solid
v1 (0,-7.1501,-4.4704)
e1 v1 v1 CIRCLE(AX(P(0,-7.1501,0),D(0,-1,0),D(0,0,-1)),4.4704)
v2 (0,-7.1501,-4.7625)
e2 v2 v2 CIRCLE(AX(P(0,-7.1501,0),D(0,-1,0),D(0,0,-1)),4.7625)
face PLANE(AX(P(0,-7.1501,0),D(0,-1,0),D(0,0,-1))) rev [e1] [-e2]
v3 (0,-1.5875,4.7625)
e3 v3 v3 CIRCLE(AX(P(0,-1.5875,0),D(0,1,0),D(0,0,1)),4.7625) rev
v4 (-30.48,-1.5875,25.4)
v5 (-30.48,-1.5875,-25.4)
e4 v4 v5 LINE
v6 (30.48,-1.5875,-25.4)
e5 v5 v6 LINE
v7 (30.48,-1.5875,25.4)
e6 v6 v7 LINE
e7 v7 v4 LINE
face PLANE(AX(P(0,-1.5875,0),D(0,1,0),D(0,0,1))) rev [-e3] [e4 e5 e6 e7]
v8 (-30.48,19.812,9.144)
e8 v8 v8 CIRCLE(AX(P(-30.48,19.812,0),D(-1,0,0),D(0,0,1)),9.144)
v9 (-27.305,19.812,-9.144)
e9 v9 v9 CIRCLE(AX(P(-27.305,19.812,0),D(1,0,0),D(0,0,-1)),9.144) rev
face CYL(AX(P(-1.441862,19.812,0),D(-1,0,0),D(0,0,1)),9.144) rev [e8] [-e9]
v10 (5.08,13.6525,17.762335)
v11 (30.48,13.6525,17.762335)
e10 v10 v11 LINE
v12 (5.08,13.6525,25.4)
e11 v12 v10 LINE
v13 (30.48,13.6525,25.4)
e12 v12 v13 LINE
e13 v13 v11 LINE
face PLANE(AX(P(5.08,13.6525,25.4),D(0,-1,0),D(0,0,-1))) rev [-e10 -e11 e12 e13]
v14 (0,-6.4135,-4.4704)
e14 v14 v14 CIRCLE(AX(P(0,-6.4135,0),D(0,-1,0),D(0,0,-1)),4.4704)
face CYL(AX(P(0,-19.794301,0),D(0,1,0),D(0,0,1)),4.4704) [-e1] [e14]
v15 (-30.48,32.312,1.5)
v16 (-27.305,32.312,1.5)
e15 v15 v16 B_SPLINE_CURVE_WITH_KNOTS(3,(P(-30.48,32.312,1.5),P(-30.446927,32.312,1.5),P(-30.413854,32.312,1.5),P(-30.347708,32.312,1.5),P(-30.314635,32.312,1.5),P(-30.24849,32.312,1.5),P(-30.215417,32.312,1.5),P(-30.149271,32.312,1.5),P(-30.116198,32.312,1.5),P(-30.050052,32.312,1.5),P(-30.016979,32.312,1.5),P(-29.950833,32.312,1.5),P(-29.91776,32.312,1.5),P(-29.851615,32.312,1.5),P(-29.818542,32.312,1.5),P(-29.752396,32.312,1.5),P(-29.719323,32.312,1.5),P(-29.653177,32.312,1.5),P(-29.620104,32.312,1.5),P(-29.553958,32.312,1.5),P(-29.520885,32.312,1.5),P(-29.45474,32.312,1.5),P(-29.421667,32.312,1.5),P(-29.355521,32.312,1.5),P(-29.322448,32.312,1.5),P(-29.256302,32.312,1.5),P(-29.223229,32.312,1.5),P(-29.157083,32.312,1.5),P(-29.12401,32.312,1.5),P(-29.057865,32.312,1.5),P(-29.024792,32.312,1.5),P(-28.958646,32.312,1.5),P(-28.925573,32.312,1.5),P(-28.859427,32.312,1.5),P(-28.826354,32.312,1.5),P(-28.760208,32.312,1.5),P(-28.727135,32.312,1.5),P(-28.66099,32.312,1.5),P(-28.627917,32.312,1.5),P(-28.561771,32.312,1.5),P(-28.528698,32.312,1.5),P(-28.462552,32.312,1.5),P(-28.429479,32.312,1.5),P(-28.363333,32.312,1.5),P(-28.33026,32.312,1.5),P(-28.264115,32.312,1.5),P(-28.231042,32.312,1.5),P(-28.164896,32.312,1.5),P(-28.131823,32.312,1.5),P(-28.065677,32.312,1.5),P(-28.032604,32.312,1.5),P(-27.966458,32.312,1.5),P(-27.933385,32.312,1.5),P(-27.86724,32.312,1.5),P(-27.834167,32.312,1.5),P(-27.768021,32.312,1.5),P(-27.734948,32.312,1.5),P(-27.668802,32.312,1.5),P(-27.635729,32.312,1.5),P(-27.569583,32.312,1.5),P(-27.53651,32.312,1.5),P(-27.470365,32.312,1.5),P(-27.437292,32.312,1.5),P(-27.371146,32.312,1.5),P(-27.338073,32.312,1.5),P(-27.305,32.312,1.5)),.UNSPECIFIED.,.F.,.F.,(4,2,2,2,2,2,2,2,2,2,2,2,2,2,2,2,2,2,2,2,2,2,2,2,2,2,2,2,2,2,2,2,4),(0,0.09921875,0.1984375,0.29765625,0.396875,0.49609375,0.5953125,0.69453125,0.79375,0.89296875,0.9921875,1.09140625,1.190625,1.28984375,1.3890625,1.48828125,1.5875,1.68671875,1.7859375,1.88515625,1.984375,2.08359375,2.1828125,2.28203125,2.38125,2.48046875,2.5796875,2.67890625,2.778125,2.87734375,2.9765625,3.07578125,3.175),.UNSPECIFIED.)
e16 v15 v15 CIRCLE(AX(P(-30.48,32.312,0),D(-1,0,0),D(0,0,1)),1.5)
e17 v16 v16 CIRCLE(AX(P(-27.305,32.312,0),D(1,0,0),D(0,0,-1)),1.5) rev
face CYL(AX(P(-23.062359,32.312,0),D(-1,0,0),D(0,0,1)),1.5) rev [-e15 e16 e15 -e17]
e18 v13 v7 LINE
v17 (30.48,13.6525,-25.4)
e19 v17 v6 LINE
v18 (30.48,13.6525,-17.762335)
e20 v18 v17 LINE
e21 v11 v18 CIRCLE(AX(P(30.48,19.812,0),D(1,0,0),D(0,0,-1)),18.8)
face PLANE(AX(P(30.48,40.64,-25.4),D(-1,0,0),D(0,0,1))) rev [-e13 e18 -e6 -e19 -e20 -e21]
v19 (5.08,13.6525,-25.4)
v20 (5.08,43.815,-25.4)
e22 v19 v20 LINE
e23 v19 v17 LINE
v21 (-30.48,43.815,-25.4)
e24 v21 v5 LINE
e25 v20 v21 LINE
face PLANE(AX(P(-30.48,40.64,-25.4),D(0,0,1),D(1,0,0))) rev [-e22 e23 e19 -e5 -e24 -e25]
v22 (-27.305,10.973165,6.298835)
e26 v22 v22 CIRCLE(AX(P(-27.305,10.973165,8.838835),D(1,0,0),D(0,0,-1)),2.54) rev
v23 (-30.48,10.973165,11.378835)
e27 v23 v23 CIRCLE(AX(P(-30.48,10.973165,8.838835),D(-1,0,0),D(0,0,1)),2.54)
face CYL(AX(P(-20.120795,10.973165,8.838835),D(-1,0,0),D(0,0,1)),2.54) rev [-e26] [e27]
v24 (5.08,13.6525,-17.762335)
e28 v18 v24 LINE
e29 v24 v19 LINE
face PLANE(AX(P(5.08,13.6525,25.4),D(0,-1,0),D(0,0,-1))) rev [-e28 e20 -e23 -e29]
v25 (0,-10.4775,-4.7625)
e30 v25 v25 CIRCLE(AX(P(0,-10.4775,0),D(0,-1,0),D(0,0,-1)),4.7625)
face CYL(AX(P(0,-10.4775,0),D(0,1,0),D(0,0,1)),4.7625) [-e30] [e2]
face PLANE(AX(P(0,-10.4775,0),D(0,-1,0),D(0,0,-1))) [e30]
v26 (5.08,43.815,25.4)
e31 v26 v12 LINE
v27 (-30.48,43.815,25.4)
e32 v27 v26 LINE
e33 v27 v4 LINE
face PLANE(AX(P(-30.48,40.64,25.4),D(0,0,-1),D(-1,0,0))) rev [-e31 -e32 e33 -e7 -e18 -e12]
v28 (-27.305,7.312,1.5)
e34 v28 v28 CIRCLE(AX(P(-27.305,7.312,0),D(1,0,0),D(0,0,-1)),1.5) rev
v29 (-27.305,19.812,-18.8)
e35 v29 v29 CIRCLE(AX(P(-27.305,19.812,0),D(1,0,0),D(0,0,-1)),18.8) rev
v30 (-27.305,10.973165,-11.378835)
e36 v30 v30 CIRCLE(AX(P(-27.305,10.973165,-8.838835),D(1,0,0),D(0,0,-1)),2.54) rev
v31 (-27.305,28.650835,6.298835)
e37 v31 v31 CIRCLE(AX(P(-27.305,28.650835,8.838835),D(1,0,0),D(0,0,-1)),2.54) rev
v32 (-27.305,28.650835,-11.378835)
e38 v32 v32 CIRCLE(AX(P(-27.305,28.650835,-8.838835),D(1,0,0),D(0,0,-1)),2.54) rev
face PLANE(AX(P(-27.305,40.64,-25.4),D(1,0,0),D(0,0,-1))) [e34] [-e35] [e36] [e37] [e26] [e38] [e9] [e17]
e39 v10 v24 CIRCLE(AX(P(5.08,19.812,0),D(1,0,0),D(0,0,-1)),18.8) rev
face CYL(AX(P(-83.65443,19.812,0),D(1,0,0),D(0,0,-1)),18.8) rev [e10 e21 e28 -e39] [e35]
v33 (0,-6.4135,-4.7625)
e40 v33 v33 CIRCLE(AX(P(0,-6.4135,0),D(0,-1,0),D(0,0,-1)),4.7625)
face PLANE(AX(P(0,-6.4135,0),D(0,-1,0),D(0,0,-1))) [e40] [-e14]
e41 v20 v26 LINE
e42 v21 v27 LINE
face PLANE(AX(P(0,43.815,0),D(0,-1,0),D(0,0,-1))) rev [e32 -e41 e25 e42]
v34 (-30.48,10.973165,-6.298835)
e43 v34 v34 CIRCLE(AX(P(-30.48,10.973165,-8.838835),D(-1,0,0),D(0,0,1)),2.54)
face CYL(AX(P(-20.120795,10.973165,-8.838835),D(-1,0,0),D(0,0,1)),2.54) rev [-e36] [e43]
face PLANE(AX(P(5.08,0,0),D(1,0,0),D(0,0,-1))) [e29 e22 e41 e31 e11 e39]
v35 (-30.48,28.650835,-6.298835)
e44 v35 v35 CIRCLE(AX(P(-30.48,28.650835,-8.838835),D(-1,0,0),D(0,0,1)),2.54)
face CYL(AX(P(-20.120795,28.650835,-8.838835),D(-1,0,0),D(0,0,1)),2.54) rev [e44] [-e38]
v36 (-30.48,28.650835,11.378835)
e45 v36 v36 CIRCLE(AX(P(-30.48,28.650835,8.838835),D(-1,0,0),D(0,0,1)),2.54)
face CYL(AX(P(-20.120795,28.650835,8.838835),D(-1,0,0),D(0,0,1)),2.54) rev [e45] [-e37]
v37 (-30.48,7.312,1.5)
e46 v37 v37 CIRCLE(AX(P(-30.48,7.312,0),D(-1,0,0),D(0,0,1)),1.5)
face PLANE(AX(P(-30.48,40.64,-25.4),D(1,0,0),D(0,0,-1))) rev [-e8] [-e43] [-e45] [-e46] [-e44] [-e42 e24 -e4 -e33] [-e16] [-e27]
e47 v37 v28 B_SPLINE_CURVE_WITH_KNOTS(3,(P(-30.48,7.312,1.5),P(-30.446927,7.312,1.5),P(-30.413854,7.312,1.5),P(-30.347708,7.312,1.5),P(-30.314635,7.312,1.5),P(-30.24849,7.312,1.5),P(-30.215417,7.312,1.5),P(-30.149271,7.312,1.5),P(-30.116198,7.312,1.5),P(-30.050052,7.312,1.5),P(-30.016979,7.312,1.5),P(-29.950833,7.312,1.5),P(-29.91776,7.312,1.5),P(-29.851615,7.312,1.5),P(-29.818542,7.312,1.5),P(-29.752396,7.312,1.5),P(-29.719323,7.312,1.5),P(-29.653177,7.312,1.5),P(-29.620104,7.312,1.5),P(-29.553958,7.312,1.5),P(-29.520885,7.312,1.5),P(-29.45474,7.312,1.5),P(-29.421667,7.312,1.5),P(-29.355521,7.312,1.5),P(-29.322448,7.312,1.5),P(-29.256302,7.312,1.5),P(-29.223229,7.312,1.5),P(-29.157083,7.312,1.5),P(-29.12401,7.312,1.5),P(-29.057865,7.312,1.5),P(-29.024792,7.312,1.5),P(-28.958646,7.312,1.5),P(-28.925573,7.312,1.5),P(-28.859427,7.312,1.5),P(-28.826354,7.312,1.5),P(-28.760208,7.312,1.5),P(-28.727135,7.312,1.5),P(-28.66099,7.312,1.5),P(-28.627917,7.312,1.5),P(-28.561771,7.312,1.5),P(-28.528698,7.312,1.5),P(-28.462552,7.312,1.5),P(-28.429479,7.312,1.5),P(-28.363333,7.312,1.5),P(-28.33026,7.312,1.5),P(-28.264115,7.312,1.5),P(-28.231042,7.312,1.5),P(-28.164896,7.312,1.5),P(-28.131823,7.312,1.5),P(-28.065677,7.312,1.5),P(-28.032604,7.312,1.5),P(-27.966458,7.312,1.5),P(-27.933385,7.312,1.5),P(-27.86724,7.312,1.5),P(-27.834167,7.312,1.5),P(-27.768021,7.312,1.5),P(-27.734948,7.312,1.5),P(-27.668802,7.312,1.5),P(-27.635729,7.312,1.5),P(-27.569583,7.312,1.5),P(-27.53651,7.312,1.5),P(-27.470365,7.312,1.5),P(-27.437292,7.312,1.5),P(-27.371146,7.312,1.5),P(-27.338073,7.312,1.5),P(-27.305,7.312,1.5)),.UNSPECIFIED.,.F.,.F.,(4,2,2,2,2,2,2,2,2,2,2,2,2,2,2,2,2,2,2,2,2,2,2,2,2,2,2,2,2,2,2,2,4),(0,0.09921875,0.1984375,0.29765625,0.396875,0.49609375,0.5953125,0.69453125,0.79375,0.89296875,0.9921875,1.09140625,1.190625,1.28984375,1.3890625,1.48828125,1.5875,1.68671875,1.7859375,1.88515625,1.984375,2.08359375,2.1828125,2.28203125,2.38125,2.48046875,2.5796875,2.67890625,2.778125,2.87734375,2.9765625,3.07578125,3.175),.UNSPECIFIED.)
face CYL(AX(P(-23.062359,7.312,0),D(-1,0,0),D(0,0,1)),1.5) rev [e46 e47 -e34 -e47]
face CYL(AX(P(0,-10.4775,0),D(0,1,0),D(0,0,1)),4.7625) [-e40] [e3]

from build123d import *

# Parameters (mm, degrees)
SKETCH1_W              = 60.96
SKETCH1_H              = 50.8
BOSS_EXTRUDE1_DEPTH    = 40.64
SKETCH3_W              = 60.96
SKETCH3_H              = 50.8
BOSS_EXTRUDE2_DEPTH    = 1.5875
SKETCH2_R              = 18.8
CUT_EXTRUDE1_DEPTH     = 57.785
SKETCH4_W              = 60.96
SKETCH4_H              = 50.8
BOSS_EXTRUDE3_DEPTH    = 3.175
SKETCH6_R              = 9.144
CUT_EXTRUDE2_DEPTH     = 3.175
SKETCH7_R              = 1.5
CUT_EXTRUDE3_DEPTH     = 3.175
SKETCH8_R              = 4.7625
BOSS_EXTRUDE4_DEPTH    = 8.89
CUT_EXTRUDE4_START     = -7.1501
CUT_EXTRUDE4_OUTLINE_R = 4.7625
CUT_EXTRUDE4_DEPTH     = 0.7366
SKETCH9_R              = 4.4704
BOSS_EXTRUDE5_DEPTH    = 0.7366
SKETCH13_R             = 2.54
CUT_EXTRUDE6_DEPTH     = 3.175
SKETCH14_W             = 50.8
SKETCH14_H             = 30.1625
CUT_EXTRUDE7_DEPTH     = 25.4


# Read off the part's stored shape, not the designer's step: Cut-Extrude4
with BuildPart() as part:
    # Sketch1 → Boss-Extrude1 (new body)
    with BuildSketch(Plane(origin=(0, 0, 0), x_dir=(1, 0, 0), z_dir=(0, 1, 0))):
        Rectangle(SKETCH1_W, SKETCH1_H)
    extrude(amount=BOSS_EXTRUDE1_DEPTH)

    # Sketch3 → Boss-Extrude2 (add)
    with BuildSketch(Plane(origin=(0, 0, 0), x_dir=(-1, 0, 0), z_dir=(0, -1, 0))):
        Rectangle(SKETCH3_W, SKETCH3_H)
    extrude(amount=BOSS_EXTRUDE2_DEPTH)

    # Sketch2 → Cut-Extrude1 (cut)
    with BuildSketch(Plane(origin=(30.48, 0, 0), x_dir=(0, 0, -1), z_dir=(1, 0, 0))):
        with Locations((0, 19.812)):
            Circle(SKETCH2_R)
    extrude(amount=-CUT_EXTRUDE1_DEPTH, mode=Mode.SUBTRACT)

    # Sketch4 → Boss-Extrude3 (add)
    with BuildSketch(Plane(origin=(0, 40.64, 0), x_dir=(1, 0, 0), z_dir=(0, 1, 0))):
        Rectangle(SKETCH4_W, SKETCH4_H)
    extrude(amount=BOSS_EXTRUDE3_DEPTH)

    # Sketch6 → Cut-Extrude2 (cut)
    with BuildSketch(Plane.ZY.offset(30.48)):
        with Locations((0, 19.812)):
            Circle(SKETCH6_R)
    extrude(amount=-CUT_EXTRUDE2_DEPTH, mode=Mode.SUBTRACT)

    # Sketch7 → Cut-Extrude3 (cut)
    with BuildSketch(Plane.ZY.offset(30.48)):
        with Locations((0, 32.312000019)):
            Circle(SKETCH7_R)
        with Locations((0, 7.311999981)):
            Circle(SKETCH7_R)
    extrude(amount=-CUT_EXTRUDE3_DEPTH, mode=Mode.SUBTRACT)

    # Sketch8 → Boss-Extrude4 (add)
    with BuildSketch(Plane.XZ.offset(1.5875)):
        with Locations(Location((0, 0, 0), (0, 0, 90))):
            Circle(SKETCH8_R)
    extrude(amount=BOSS_EXTRUDE4_DEPTH)

    # Cut-Extrude4 outline → Cut-Extrude4 (cut)
    with BuildSketch(Plane(origin=(0, 0, 0), x_dir=(1, 0, 0), z_dir=(0, 1, 0)).offset(CUT_EXTRUDE4_START)):
        Circle(CUT_EXTRUDE4_OUTLINE_R)
    extrude(amount=CUT_EXTRUDE4_DEPTH, mode=Mode.SUBTRACT)

    # Sketch9 → Boss-Extrude5 (add)
    with BuildSketch(Plane(origin=(0, -6.4135, 0), x_dir=(-1, 0, 0), z_dir=(0, -1, 0))):
        with Locations(Location((0, 0, 0), (0, 0, 90))):
            Circle(SKETCH9_R)
    extrude(amount=BOSS_EXTRUDE5_DEPTH)

    # Sketch13 → Cut-Extrude6 (cut)
    with BuildSketch(Plane.ZY.offset(30.48)):
        with Locations((8.838834778, 28.650834778)):
            Circle(SKETCH13_R)
        with Locations((-8.838834778, 28.650834778)):
            Circle(SKETCH13_R)
        with Locations((-8.838834778, 10.973165222)):
            Circle(SKETCH13_R)
        with Locations((8.838834778, 10.973165222)):
            Circle(SKETCH13_R)
    extrude(amount=-CUT_EXTRUDE6_DEPTH, mode=Mode.SUBTRACT)

    # Sketch14 → Cut-Extrude7 (cut)
    with BuildSketch(Plane(origin=(30.48, 0, 0), x_dir=(0, 0, -1), z_dir=(1, 0, 0))):
        with Locations((0, 28.73375)):
            Rectangle(SKETCH14_W, SKETCH14_H)
    extrude(amount=-CUT_EXTRUDE7_DEPTH, mode=Mode.SUBTRACT)


solid = part.part
